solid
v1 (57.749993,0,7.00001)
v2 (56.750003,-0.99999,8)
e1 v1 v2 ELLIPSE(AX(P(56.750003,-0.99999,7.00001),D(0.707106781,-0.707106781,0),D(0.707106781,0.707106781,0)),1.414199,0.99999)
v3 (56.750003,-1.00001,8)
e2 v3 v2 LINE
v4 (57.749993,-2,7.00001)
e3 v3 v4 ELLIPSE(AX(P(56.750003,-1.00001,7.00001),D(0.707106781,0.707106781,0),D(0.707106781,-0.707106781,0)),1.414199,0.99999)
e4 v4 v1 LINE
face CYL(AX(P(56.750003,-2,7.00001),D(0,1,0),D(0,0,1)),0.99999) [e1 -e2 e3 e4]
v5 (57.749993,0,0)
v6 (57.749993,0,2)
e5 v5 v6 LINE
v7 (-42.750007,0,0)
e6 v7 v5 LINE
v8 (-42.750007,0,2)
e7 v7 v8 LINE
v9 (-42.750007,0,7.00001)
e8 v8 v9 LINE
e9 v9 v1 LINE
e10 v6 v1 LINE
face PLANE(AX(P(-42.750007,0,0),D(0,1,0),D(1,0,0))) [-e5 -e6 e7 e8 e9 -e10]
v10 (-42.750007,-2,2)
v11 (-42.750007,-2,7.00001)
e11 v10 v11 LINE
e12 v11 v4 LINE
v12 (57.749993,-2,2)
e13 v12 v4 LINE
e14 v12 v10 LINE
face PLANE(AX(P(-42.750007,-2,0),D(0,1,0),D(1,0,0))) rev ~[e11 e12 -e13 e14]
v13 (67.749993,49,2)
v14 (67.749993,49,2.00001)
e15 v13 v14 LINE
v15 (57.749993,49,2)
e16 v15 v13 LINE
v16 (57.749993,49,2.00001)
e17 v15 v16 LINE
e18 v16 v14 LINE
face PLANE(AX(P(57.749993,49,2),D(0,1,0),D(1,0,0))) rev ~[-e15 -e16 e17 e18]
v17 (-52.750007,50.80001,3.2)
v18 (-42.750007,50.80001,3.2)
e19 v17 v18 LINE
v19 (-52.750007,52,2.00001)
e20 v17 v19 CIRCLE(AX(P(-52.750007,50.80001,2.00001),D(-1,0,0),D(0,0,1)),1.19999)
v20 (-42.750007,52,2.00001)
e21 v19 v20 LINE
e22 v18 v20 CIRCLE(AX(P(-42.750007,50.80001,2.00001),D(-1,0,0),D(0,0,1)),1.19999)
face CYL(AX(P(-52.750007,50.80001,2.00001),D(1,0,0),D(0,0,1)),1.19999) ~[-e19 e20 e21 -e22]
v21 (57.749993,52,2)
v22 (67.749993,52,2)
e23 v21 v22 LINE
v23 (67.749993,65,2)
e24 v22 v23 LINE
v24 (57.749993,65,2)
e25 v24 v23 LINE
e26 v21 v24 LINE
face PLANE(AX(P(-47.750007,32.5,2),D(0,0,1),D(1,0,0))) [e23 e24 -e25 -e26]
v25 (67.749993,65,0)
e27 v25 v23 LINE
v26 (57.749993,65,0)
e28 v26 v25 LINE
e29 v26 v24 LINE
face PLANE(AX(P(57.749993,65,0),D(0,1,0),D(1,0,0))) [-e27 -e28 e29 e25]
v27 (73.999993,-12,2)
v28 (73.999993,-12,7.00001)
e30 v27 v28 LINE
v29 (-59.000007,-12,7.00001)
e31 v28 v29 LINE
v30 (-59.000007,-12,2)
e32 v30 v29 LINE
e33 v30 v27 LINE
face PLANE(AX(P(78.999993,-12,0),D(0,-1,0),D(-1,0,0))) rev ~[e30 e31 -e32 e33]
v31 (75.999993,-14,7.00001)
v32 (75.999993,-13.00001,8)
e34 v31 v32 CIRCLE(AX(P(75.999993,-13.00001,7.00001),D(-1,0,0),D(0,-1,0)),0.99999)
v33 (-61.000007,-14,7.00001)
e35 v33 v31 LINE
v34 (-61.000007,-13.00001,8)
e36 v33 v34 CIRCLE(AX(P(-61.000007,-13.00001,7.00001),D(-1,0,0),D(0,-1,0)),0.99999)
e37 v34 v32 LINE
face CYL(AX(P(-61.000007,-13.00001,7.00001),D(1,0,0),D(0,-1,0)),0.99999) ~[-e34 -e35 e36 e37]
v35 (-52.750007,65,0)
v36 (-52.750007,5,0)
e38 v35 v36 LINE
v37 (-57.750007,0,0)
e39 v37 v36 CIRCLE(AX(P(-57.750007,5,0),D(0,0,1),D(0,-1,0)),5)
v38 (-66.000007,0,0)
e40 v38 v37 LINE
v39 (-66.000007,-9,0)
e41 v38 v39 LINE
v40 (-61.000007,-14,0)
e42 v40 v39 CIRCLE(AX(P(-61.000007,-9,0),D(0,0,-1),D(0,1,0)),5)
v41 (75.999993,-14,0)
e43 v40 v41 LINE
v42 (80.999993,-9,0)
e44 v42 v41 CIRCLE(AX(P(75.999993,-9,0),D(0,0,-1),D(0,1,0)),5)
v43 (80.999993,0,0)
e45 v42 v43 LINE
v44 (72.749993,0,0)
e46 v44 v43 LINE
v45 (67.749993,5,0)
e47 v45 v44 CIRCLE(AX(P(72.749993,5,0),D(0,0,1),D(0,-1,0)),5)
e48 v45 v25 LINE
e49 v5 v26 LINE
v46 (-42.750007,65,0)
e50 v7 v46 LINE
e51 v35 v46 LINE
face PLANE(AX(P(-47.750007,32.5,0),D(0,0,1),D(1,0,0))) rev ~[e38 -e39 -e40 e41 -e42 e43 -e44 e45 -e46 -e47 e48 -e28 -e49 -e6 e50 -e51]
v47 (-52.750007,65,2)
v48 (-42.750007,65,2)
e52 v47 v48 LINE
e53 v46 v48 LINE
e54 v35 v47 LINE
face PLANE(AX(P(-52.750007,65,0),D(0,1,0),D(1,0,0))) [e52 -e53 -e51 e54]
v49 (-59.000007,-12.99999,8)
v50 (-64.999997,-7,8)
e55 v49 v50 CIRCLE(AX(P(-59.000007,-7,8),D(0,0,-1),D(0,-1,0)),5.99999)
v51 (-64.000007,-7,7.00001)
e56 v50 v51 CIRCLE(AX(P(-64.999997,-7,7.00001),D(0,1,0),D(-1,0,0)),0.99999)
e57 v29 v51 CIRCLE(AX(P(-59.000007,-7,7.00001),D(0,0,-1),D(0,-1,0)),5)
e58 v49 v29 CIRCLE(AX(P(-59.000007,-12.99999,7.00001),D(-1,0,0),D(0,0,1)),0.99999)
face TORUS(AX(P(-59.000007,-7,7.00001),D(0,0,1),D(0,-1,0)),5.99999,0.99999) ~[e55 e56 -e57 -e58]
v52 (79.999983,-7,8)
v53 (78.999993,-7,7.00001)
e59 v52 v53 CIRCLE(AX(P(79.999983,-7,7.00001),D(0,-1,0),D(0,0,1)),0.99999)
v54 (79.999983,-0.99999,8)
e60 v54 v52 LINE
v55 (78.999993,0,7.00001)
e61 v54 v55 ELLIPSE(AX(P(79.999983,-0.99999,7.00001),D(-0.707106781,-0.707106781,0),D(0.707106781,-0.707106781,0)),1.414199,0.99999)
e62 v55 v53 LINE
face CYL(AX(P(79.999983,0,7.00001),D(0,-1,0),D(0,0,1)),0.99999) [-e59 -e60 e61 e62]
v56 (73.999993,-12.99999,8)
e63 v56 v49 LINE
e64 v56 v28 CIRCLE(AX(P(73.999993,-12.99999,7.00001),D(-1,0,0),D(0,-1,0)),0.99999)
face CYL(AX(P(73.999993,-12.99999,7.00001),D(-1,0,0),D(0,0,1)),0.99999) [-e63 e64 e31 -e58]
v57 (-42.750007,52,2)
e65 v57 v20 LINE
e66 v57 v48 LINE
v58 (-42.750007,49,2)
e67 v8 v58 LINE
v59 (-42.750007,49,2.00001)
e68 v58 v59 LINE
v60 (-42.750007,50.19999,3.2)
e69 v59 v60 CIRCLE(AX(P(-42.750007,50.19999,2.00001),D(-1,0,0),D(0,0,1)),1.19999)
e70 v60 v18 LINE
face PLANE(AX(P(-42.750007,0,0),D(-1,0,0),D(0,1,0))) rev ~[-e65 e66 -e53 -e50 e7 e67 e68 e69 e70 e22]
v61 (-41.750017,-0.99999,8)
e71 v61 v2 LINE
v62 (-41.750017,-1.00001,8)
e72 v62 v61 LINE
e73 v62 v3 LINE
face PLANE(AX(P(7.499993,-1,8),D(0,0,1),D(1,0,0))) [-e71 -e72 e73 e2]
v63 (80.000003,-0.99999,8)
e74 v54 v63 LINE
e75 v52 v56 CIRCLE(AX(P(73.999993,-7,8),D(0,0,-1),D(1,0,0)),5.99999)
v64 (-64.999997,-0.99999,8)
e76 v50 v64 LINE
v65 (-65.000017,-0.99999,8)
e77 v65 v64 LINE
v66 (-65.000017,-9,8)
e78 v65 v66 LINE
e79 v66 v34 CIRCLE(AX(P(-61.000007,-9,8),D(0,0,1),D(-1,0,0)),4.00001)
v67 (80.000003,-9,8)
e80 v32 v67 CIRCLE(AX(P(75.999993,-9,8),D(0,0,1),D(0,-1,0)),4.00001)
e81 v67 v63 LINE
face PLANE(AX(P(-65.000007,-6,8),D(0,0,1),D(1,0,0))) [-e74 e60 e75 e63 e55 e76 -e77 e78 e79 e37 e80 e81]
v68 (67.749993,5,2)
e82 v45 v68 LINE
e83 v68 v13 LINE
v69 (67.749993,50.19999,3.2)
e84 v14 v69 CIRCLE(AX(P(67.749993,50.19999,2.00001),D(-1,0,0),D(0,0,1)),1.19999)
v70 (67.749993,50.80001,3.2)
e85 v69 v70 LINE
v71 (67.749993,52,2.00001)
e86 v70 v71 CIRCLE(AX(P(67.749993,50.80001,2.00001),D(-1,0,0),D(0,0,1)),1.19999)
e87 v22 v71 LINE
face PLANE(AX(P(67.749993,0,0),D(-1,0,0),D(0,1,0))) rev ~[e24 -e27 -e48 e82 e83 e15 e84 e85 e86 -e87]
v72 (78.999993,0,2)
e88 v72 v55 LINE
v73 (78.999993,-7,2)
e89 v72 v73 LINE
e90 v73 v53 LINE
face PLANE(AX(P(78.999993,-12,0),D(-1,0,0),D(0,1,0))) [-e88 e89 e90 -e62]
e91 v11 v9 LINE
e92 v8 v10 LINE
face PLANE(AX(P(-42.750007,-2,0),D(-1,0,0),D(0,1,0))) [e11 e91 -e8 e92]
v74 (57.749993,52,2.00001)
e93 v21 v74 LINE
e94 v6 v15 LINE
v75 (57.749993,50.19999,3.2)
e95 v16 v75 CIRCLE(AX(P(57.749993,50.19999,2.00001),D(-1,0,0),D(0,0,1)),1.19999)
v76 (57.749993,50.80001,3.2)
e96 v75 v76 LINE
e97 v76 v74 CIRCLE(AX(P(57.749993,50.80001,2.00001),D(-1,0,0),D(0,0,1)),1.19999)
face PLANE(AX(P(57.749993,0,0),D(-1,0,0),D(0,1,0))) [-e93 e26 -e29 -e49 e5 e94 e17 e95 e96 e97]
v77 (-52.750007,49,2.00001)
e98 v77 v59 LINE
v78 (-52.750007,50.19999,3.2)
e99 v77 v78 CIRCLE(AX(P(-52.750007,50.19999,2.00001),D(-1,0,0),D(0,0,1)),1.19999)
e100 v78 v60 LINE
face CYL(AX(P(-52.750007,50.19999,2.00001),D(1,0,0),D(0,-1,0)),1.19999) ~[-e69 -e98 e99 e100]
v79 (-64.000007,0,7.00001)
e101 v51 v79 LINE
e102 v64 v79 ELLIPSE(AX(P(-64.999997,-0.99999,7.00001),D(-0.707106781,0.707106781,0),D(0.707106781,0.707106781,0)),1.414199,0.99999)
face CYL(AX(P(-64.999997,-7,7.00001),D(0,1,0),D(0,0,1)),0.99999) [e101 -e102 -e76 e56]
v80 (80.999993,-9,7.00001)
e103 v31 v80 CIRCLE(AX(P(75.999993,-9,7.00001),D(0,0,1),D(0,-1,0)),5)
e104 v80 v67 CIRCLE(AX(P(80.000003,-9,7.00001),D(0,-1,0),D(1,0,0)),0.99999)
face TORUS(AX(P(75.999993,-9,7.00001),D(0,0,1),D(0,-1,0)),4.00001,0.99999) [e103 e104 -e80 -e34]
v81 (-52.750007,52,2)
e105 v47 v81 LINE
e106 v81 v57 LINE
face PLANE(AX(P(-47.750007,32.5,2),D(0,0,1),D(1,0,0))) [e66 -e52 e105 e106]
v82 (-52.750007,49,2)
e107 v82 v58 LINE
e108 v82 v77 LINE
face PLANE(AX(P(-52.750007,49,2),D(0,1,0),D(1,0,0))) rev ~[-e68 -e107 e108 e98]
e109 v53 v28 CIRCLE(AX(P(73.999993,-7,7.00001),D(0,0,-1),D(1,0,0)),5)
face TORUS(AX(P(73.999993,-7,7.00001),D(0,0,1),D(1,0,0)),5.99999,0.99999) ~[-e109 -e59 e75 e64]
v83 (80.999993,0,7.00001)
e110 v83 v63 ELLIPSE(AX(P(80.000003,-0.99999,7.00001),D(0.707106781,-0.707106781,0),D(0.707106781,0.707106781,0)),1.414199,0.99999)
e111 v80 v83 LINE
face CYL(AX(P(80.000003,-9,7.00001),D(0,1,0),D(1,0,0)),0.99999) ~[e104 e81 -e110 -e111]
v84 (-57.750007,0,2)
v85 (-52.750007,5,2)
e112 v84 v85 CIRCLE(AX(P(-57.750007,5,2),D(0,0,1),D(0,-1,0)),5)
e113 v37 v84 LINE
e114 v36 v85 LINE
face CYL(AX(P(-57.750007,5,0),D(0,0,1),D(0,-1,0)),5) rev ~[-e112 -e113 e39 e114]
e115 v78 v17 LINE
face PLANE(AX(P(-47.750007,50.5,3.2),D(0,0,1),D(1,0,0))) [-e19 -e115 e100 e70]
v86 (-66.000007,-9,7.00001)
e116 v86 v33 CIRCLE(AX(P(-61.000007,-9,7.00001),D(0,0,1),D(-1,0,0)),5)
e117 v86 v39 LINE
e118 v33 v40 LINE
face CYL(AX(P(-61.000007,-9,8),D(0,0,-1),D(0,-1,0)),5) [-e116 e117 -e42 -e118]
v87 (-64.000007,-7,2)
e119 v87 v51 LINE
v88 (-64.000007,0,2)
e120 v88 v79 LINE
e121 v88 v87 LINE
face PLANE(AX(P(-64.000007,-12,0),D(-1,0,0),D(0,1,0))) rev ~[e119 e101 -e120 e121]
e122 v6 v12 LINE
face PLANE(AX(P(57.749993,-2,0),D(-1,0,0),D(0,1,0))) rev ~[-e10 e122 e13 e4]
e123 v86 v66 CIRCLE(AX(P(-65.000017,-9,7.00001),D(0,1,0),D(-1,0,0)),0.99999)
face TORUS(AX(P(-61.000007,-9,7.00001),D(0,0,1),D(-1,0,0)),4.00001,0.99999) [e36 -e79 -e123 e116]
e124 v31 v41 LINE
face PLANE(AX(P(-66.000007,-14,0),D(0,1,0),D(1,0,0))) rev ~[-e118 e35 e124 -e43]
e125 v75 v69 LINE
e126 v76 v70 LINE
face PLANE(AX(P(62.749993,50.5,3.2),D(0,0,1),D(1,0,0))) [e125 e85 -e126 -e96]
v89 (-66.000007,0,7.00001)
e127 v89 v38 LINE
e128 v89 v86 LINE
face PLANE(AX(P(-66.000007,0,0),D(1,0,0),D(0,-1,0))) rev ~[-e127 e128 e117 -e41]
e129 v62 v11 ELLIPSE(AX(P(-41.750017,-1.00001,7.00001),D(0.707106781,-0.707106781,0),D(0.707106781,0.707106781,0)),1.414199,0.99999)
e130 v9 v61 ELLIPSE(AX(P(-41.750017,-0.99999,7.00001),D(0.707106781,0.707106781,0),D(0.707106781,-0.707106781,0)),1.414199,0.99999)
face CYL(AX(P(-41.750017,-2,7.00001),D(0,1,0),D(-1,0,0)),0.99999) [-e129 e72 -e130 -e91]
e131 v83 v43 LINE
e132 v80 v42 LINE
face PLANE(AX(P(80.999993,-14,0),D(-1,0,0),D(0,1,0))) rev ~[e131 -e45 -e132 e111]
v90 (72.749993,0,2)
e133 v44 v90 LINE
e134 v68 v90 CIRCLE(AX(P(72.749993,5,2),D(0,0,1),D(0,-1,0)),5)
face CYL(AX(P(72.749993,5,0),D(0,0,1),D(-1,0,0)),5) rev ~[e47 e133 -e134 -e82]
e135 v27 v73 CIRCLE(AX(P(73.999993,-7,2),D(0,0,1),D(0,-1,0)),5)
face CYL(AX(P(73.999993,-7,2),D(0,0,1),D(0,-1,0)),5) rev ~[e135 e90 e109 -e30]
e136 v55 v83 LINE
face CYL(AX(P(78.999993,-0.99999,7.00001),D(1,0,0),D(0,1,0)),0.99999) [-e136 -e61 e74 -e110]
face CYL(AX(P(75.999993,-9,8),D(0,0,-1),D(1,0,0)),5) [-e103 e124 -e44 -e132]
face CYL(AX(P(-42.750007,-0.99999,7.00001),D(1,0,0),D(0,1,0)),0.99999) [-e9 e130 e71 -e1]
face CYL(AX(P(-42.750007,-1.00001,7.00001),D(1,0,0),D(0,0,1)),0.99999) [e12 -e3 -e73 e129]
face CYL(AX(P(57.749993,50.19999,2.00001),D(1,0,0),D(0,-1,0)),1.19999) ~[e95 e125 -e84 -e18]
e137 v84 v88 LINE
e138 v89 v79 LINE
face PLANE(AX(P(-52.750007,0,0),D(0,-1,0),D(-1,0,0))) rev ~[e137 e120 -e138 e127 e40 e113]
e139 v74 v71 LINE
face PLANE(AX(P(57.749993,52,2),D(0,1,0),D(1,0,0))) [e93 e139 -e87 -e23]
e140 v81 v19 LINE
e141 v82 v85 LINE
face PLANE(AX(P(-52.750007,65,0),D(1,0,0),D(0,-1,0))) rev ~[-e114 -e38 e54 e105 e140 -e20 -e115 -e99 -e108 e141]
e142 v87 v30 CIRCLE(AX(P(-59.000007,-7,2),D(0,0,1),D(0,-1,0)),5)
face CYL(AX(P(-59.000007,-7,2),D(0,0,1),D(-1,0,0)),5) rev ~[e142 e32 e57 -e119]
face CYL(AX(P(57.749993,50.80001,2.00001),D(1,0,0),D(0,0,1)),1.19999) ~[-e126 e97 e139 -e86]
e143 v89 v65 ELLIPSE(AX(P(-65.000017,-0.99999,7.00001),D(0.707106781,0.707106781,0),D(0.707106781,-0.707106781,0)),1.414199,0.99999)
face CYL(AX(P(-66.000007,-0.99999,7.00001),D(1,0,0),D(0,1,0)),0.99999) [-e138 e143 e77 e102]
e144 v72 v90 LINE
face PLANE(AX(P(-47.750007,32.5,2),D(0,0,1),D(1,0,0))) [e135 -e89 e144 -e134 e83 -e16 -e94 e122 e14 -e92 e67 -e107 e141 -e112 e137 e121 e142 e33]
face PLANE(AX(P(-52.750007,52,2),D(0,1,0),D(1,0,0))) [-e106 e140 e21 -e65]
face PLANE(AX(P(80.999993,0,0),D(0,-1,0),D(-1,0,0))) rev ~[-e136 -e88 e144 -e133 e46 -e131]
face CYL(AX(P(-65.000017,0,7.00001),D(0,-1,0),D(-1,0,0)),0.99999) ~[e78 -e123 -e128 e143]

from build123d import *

# Parameters (mm, degrees)
F2_W     = 10
F2_H     = 65
F2_W_2   = 11.25
F2_H_2   = 12
F2_W_3   = 100.5
F2_H_3   = 2
F2_W_4   = 2
F2_H_4   = 10
F3_DEPTH = 2
F4_DEPTH = 8
F5_R     = 5
F6_R     = 0.99999
F7_W     = 10
F7_H     = 3
F8_DEPTH = 1.2
F9_R     = 1.19999


# Not quite as in the source:
# - a fillet or chamfer is up to 0.001 mm smaller than in the source, because OpenCascade refuses the exact size


with BuildPart() as f3:
    # F2 (on Top) → F3 (new body)
    with BuildSketch(Plane.XY):
        with Locations((-47.7500067828, 32.5)):
            Rectangle(F2_W, F2_H)
        Polygon((-42.7500067828, 0), (-52.7500067828, 0), (-52.7500067828, -12), (-42.7500067828, -12), (-42.7500067828, -2), align=None)
        with Locations((-58.3750067828, -6)):
            Rectangle(F2_W_2, F2_H_2)
        with Locations((7.4999932172, -1)):
            Rectangle(F2_W_3, F2_H_3)
        Polygon((-42.7500067828, -12), (-52.7500067828, -12), (-64.0000067828, -12), (-66.0000067828, -12), (-66.0000067828, -14), (80.9999932172, -14), (80.9999932172, -12), (78.9999932172, -12), (67.7499932172, -12), (57.7499932172, -12), align=None)
        with Locations((-65.0000067828, -6)):
            Rectangle(F2_W_4, F2_H_2)
        with Locations((62.7499932172, 32.5)):
            Rectangle(F2_W, F2_H)
        Polygon((67.7499932172, 0), (57.7499932172, 0), (57.7499932172, -2), (57.7499932172, -12), (67.7499932172, -12), align=None)
        with Locations((73.3749932172, -6)):
            Rectangle(F2_W_2, F2_H_2)
        with Locations((79.9999932172, -6)):
            Rectangle(F2_W_4, F2_H_2)
        with Locations((7.4999932172, -7)):
            Rectangle(F2_W_3, F2_H_4)
    extrude(amount=F3_DEPTH)

    # F2 (on Top) → F4 (join)
    with BuildSketch(Plane.XY):
        with Locations((-65.0000067828, -6)):
            Rectangle(F2_W_4, F2_H_2)
        Polygon((-42.7500067828, -12), (-52.7500067828, -12), (-64.0000067828, -12), (-66.0000067828, -12), (-66.0000067828, -14), (80.9999932172, -14), (80.9999932172, -12), (78.9999932172, -12), (67.7499932172, -12), (57.7499932172, -12), align=None)
        with Locations((79.9999932172, -6)):
            Rectangle(F2_W_4, F2_H_2)
        with Locations((7.4999932172, -1)):
            Rectangle(F2_W_3, F2_H_3)
    extrude(amount=F4_DEPTH)

    # F5
    f5_edges = [f3.edges().sort_by_distance(p)[0] for p in [
        (-66.000007, -14, 4),
        (80.999993, -14, 4),
        (-64.000007, -12, 5),
        (78.999993, -12, 5),
        (67.749993, 0, 1),
        (-52.750007, 0, 1),
    ]]
    fillet(f5_edges, radius=F5_R)

    # F6 (radius 1 in the source; OpenCascade refuses exactly that, so slightly less here)
    f6_edges = [f3.edges().sort_by_distance(p)[0] for p in [
        (7.499993, -14, 8),
        (7.499993, -12, 8),
        (79.999993, 0, 8),
        (-65.000007, 0, 8),
        (7.499993, -2, 8),
        (7.499993, 0, 8),
        (57.749993, -1, 8),
        (-42.750007, -1, 8),
    ]]
    fillet(f6_edges, radius=F6_R)

    # F7 (on face) → F8 (join)
    with BuildSketch(Plane.XY.offset(2)):
        with Locations((-47.7500067828, 50.5)):
            Rectangle(F7_W, F7_H)
        with Locations((62.7499932172, 50.5)):
            Rectangle(F7_W, F7_H)
    extrude(amount=F8_DEPTH)

    # F9 (radius 1.2 in the source; OpenCascade refuses exactly that, so slightly less here)
    f9_edges = [f3.edges().sort_by_distance(p)[0] for p in [
        (-47.750007, 49, 3.2),
        (-47.750007, 52, 3.2),
        (62.749993, 49, 3.2),
        (62.749993, 52, 3.2),
    ]]
    fillet(f9_edges, radius=F9_R)


solid = f3.part
